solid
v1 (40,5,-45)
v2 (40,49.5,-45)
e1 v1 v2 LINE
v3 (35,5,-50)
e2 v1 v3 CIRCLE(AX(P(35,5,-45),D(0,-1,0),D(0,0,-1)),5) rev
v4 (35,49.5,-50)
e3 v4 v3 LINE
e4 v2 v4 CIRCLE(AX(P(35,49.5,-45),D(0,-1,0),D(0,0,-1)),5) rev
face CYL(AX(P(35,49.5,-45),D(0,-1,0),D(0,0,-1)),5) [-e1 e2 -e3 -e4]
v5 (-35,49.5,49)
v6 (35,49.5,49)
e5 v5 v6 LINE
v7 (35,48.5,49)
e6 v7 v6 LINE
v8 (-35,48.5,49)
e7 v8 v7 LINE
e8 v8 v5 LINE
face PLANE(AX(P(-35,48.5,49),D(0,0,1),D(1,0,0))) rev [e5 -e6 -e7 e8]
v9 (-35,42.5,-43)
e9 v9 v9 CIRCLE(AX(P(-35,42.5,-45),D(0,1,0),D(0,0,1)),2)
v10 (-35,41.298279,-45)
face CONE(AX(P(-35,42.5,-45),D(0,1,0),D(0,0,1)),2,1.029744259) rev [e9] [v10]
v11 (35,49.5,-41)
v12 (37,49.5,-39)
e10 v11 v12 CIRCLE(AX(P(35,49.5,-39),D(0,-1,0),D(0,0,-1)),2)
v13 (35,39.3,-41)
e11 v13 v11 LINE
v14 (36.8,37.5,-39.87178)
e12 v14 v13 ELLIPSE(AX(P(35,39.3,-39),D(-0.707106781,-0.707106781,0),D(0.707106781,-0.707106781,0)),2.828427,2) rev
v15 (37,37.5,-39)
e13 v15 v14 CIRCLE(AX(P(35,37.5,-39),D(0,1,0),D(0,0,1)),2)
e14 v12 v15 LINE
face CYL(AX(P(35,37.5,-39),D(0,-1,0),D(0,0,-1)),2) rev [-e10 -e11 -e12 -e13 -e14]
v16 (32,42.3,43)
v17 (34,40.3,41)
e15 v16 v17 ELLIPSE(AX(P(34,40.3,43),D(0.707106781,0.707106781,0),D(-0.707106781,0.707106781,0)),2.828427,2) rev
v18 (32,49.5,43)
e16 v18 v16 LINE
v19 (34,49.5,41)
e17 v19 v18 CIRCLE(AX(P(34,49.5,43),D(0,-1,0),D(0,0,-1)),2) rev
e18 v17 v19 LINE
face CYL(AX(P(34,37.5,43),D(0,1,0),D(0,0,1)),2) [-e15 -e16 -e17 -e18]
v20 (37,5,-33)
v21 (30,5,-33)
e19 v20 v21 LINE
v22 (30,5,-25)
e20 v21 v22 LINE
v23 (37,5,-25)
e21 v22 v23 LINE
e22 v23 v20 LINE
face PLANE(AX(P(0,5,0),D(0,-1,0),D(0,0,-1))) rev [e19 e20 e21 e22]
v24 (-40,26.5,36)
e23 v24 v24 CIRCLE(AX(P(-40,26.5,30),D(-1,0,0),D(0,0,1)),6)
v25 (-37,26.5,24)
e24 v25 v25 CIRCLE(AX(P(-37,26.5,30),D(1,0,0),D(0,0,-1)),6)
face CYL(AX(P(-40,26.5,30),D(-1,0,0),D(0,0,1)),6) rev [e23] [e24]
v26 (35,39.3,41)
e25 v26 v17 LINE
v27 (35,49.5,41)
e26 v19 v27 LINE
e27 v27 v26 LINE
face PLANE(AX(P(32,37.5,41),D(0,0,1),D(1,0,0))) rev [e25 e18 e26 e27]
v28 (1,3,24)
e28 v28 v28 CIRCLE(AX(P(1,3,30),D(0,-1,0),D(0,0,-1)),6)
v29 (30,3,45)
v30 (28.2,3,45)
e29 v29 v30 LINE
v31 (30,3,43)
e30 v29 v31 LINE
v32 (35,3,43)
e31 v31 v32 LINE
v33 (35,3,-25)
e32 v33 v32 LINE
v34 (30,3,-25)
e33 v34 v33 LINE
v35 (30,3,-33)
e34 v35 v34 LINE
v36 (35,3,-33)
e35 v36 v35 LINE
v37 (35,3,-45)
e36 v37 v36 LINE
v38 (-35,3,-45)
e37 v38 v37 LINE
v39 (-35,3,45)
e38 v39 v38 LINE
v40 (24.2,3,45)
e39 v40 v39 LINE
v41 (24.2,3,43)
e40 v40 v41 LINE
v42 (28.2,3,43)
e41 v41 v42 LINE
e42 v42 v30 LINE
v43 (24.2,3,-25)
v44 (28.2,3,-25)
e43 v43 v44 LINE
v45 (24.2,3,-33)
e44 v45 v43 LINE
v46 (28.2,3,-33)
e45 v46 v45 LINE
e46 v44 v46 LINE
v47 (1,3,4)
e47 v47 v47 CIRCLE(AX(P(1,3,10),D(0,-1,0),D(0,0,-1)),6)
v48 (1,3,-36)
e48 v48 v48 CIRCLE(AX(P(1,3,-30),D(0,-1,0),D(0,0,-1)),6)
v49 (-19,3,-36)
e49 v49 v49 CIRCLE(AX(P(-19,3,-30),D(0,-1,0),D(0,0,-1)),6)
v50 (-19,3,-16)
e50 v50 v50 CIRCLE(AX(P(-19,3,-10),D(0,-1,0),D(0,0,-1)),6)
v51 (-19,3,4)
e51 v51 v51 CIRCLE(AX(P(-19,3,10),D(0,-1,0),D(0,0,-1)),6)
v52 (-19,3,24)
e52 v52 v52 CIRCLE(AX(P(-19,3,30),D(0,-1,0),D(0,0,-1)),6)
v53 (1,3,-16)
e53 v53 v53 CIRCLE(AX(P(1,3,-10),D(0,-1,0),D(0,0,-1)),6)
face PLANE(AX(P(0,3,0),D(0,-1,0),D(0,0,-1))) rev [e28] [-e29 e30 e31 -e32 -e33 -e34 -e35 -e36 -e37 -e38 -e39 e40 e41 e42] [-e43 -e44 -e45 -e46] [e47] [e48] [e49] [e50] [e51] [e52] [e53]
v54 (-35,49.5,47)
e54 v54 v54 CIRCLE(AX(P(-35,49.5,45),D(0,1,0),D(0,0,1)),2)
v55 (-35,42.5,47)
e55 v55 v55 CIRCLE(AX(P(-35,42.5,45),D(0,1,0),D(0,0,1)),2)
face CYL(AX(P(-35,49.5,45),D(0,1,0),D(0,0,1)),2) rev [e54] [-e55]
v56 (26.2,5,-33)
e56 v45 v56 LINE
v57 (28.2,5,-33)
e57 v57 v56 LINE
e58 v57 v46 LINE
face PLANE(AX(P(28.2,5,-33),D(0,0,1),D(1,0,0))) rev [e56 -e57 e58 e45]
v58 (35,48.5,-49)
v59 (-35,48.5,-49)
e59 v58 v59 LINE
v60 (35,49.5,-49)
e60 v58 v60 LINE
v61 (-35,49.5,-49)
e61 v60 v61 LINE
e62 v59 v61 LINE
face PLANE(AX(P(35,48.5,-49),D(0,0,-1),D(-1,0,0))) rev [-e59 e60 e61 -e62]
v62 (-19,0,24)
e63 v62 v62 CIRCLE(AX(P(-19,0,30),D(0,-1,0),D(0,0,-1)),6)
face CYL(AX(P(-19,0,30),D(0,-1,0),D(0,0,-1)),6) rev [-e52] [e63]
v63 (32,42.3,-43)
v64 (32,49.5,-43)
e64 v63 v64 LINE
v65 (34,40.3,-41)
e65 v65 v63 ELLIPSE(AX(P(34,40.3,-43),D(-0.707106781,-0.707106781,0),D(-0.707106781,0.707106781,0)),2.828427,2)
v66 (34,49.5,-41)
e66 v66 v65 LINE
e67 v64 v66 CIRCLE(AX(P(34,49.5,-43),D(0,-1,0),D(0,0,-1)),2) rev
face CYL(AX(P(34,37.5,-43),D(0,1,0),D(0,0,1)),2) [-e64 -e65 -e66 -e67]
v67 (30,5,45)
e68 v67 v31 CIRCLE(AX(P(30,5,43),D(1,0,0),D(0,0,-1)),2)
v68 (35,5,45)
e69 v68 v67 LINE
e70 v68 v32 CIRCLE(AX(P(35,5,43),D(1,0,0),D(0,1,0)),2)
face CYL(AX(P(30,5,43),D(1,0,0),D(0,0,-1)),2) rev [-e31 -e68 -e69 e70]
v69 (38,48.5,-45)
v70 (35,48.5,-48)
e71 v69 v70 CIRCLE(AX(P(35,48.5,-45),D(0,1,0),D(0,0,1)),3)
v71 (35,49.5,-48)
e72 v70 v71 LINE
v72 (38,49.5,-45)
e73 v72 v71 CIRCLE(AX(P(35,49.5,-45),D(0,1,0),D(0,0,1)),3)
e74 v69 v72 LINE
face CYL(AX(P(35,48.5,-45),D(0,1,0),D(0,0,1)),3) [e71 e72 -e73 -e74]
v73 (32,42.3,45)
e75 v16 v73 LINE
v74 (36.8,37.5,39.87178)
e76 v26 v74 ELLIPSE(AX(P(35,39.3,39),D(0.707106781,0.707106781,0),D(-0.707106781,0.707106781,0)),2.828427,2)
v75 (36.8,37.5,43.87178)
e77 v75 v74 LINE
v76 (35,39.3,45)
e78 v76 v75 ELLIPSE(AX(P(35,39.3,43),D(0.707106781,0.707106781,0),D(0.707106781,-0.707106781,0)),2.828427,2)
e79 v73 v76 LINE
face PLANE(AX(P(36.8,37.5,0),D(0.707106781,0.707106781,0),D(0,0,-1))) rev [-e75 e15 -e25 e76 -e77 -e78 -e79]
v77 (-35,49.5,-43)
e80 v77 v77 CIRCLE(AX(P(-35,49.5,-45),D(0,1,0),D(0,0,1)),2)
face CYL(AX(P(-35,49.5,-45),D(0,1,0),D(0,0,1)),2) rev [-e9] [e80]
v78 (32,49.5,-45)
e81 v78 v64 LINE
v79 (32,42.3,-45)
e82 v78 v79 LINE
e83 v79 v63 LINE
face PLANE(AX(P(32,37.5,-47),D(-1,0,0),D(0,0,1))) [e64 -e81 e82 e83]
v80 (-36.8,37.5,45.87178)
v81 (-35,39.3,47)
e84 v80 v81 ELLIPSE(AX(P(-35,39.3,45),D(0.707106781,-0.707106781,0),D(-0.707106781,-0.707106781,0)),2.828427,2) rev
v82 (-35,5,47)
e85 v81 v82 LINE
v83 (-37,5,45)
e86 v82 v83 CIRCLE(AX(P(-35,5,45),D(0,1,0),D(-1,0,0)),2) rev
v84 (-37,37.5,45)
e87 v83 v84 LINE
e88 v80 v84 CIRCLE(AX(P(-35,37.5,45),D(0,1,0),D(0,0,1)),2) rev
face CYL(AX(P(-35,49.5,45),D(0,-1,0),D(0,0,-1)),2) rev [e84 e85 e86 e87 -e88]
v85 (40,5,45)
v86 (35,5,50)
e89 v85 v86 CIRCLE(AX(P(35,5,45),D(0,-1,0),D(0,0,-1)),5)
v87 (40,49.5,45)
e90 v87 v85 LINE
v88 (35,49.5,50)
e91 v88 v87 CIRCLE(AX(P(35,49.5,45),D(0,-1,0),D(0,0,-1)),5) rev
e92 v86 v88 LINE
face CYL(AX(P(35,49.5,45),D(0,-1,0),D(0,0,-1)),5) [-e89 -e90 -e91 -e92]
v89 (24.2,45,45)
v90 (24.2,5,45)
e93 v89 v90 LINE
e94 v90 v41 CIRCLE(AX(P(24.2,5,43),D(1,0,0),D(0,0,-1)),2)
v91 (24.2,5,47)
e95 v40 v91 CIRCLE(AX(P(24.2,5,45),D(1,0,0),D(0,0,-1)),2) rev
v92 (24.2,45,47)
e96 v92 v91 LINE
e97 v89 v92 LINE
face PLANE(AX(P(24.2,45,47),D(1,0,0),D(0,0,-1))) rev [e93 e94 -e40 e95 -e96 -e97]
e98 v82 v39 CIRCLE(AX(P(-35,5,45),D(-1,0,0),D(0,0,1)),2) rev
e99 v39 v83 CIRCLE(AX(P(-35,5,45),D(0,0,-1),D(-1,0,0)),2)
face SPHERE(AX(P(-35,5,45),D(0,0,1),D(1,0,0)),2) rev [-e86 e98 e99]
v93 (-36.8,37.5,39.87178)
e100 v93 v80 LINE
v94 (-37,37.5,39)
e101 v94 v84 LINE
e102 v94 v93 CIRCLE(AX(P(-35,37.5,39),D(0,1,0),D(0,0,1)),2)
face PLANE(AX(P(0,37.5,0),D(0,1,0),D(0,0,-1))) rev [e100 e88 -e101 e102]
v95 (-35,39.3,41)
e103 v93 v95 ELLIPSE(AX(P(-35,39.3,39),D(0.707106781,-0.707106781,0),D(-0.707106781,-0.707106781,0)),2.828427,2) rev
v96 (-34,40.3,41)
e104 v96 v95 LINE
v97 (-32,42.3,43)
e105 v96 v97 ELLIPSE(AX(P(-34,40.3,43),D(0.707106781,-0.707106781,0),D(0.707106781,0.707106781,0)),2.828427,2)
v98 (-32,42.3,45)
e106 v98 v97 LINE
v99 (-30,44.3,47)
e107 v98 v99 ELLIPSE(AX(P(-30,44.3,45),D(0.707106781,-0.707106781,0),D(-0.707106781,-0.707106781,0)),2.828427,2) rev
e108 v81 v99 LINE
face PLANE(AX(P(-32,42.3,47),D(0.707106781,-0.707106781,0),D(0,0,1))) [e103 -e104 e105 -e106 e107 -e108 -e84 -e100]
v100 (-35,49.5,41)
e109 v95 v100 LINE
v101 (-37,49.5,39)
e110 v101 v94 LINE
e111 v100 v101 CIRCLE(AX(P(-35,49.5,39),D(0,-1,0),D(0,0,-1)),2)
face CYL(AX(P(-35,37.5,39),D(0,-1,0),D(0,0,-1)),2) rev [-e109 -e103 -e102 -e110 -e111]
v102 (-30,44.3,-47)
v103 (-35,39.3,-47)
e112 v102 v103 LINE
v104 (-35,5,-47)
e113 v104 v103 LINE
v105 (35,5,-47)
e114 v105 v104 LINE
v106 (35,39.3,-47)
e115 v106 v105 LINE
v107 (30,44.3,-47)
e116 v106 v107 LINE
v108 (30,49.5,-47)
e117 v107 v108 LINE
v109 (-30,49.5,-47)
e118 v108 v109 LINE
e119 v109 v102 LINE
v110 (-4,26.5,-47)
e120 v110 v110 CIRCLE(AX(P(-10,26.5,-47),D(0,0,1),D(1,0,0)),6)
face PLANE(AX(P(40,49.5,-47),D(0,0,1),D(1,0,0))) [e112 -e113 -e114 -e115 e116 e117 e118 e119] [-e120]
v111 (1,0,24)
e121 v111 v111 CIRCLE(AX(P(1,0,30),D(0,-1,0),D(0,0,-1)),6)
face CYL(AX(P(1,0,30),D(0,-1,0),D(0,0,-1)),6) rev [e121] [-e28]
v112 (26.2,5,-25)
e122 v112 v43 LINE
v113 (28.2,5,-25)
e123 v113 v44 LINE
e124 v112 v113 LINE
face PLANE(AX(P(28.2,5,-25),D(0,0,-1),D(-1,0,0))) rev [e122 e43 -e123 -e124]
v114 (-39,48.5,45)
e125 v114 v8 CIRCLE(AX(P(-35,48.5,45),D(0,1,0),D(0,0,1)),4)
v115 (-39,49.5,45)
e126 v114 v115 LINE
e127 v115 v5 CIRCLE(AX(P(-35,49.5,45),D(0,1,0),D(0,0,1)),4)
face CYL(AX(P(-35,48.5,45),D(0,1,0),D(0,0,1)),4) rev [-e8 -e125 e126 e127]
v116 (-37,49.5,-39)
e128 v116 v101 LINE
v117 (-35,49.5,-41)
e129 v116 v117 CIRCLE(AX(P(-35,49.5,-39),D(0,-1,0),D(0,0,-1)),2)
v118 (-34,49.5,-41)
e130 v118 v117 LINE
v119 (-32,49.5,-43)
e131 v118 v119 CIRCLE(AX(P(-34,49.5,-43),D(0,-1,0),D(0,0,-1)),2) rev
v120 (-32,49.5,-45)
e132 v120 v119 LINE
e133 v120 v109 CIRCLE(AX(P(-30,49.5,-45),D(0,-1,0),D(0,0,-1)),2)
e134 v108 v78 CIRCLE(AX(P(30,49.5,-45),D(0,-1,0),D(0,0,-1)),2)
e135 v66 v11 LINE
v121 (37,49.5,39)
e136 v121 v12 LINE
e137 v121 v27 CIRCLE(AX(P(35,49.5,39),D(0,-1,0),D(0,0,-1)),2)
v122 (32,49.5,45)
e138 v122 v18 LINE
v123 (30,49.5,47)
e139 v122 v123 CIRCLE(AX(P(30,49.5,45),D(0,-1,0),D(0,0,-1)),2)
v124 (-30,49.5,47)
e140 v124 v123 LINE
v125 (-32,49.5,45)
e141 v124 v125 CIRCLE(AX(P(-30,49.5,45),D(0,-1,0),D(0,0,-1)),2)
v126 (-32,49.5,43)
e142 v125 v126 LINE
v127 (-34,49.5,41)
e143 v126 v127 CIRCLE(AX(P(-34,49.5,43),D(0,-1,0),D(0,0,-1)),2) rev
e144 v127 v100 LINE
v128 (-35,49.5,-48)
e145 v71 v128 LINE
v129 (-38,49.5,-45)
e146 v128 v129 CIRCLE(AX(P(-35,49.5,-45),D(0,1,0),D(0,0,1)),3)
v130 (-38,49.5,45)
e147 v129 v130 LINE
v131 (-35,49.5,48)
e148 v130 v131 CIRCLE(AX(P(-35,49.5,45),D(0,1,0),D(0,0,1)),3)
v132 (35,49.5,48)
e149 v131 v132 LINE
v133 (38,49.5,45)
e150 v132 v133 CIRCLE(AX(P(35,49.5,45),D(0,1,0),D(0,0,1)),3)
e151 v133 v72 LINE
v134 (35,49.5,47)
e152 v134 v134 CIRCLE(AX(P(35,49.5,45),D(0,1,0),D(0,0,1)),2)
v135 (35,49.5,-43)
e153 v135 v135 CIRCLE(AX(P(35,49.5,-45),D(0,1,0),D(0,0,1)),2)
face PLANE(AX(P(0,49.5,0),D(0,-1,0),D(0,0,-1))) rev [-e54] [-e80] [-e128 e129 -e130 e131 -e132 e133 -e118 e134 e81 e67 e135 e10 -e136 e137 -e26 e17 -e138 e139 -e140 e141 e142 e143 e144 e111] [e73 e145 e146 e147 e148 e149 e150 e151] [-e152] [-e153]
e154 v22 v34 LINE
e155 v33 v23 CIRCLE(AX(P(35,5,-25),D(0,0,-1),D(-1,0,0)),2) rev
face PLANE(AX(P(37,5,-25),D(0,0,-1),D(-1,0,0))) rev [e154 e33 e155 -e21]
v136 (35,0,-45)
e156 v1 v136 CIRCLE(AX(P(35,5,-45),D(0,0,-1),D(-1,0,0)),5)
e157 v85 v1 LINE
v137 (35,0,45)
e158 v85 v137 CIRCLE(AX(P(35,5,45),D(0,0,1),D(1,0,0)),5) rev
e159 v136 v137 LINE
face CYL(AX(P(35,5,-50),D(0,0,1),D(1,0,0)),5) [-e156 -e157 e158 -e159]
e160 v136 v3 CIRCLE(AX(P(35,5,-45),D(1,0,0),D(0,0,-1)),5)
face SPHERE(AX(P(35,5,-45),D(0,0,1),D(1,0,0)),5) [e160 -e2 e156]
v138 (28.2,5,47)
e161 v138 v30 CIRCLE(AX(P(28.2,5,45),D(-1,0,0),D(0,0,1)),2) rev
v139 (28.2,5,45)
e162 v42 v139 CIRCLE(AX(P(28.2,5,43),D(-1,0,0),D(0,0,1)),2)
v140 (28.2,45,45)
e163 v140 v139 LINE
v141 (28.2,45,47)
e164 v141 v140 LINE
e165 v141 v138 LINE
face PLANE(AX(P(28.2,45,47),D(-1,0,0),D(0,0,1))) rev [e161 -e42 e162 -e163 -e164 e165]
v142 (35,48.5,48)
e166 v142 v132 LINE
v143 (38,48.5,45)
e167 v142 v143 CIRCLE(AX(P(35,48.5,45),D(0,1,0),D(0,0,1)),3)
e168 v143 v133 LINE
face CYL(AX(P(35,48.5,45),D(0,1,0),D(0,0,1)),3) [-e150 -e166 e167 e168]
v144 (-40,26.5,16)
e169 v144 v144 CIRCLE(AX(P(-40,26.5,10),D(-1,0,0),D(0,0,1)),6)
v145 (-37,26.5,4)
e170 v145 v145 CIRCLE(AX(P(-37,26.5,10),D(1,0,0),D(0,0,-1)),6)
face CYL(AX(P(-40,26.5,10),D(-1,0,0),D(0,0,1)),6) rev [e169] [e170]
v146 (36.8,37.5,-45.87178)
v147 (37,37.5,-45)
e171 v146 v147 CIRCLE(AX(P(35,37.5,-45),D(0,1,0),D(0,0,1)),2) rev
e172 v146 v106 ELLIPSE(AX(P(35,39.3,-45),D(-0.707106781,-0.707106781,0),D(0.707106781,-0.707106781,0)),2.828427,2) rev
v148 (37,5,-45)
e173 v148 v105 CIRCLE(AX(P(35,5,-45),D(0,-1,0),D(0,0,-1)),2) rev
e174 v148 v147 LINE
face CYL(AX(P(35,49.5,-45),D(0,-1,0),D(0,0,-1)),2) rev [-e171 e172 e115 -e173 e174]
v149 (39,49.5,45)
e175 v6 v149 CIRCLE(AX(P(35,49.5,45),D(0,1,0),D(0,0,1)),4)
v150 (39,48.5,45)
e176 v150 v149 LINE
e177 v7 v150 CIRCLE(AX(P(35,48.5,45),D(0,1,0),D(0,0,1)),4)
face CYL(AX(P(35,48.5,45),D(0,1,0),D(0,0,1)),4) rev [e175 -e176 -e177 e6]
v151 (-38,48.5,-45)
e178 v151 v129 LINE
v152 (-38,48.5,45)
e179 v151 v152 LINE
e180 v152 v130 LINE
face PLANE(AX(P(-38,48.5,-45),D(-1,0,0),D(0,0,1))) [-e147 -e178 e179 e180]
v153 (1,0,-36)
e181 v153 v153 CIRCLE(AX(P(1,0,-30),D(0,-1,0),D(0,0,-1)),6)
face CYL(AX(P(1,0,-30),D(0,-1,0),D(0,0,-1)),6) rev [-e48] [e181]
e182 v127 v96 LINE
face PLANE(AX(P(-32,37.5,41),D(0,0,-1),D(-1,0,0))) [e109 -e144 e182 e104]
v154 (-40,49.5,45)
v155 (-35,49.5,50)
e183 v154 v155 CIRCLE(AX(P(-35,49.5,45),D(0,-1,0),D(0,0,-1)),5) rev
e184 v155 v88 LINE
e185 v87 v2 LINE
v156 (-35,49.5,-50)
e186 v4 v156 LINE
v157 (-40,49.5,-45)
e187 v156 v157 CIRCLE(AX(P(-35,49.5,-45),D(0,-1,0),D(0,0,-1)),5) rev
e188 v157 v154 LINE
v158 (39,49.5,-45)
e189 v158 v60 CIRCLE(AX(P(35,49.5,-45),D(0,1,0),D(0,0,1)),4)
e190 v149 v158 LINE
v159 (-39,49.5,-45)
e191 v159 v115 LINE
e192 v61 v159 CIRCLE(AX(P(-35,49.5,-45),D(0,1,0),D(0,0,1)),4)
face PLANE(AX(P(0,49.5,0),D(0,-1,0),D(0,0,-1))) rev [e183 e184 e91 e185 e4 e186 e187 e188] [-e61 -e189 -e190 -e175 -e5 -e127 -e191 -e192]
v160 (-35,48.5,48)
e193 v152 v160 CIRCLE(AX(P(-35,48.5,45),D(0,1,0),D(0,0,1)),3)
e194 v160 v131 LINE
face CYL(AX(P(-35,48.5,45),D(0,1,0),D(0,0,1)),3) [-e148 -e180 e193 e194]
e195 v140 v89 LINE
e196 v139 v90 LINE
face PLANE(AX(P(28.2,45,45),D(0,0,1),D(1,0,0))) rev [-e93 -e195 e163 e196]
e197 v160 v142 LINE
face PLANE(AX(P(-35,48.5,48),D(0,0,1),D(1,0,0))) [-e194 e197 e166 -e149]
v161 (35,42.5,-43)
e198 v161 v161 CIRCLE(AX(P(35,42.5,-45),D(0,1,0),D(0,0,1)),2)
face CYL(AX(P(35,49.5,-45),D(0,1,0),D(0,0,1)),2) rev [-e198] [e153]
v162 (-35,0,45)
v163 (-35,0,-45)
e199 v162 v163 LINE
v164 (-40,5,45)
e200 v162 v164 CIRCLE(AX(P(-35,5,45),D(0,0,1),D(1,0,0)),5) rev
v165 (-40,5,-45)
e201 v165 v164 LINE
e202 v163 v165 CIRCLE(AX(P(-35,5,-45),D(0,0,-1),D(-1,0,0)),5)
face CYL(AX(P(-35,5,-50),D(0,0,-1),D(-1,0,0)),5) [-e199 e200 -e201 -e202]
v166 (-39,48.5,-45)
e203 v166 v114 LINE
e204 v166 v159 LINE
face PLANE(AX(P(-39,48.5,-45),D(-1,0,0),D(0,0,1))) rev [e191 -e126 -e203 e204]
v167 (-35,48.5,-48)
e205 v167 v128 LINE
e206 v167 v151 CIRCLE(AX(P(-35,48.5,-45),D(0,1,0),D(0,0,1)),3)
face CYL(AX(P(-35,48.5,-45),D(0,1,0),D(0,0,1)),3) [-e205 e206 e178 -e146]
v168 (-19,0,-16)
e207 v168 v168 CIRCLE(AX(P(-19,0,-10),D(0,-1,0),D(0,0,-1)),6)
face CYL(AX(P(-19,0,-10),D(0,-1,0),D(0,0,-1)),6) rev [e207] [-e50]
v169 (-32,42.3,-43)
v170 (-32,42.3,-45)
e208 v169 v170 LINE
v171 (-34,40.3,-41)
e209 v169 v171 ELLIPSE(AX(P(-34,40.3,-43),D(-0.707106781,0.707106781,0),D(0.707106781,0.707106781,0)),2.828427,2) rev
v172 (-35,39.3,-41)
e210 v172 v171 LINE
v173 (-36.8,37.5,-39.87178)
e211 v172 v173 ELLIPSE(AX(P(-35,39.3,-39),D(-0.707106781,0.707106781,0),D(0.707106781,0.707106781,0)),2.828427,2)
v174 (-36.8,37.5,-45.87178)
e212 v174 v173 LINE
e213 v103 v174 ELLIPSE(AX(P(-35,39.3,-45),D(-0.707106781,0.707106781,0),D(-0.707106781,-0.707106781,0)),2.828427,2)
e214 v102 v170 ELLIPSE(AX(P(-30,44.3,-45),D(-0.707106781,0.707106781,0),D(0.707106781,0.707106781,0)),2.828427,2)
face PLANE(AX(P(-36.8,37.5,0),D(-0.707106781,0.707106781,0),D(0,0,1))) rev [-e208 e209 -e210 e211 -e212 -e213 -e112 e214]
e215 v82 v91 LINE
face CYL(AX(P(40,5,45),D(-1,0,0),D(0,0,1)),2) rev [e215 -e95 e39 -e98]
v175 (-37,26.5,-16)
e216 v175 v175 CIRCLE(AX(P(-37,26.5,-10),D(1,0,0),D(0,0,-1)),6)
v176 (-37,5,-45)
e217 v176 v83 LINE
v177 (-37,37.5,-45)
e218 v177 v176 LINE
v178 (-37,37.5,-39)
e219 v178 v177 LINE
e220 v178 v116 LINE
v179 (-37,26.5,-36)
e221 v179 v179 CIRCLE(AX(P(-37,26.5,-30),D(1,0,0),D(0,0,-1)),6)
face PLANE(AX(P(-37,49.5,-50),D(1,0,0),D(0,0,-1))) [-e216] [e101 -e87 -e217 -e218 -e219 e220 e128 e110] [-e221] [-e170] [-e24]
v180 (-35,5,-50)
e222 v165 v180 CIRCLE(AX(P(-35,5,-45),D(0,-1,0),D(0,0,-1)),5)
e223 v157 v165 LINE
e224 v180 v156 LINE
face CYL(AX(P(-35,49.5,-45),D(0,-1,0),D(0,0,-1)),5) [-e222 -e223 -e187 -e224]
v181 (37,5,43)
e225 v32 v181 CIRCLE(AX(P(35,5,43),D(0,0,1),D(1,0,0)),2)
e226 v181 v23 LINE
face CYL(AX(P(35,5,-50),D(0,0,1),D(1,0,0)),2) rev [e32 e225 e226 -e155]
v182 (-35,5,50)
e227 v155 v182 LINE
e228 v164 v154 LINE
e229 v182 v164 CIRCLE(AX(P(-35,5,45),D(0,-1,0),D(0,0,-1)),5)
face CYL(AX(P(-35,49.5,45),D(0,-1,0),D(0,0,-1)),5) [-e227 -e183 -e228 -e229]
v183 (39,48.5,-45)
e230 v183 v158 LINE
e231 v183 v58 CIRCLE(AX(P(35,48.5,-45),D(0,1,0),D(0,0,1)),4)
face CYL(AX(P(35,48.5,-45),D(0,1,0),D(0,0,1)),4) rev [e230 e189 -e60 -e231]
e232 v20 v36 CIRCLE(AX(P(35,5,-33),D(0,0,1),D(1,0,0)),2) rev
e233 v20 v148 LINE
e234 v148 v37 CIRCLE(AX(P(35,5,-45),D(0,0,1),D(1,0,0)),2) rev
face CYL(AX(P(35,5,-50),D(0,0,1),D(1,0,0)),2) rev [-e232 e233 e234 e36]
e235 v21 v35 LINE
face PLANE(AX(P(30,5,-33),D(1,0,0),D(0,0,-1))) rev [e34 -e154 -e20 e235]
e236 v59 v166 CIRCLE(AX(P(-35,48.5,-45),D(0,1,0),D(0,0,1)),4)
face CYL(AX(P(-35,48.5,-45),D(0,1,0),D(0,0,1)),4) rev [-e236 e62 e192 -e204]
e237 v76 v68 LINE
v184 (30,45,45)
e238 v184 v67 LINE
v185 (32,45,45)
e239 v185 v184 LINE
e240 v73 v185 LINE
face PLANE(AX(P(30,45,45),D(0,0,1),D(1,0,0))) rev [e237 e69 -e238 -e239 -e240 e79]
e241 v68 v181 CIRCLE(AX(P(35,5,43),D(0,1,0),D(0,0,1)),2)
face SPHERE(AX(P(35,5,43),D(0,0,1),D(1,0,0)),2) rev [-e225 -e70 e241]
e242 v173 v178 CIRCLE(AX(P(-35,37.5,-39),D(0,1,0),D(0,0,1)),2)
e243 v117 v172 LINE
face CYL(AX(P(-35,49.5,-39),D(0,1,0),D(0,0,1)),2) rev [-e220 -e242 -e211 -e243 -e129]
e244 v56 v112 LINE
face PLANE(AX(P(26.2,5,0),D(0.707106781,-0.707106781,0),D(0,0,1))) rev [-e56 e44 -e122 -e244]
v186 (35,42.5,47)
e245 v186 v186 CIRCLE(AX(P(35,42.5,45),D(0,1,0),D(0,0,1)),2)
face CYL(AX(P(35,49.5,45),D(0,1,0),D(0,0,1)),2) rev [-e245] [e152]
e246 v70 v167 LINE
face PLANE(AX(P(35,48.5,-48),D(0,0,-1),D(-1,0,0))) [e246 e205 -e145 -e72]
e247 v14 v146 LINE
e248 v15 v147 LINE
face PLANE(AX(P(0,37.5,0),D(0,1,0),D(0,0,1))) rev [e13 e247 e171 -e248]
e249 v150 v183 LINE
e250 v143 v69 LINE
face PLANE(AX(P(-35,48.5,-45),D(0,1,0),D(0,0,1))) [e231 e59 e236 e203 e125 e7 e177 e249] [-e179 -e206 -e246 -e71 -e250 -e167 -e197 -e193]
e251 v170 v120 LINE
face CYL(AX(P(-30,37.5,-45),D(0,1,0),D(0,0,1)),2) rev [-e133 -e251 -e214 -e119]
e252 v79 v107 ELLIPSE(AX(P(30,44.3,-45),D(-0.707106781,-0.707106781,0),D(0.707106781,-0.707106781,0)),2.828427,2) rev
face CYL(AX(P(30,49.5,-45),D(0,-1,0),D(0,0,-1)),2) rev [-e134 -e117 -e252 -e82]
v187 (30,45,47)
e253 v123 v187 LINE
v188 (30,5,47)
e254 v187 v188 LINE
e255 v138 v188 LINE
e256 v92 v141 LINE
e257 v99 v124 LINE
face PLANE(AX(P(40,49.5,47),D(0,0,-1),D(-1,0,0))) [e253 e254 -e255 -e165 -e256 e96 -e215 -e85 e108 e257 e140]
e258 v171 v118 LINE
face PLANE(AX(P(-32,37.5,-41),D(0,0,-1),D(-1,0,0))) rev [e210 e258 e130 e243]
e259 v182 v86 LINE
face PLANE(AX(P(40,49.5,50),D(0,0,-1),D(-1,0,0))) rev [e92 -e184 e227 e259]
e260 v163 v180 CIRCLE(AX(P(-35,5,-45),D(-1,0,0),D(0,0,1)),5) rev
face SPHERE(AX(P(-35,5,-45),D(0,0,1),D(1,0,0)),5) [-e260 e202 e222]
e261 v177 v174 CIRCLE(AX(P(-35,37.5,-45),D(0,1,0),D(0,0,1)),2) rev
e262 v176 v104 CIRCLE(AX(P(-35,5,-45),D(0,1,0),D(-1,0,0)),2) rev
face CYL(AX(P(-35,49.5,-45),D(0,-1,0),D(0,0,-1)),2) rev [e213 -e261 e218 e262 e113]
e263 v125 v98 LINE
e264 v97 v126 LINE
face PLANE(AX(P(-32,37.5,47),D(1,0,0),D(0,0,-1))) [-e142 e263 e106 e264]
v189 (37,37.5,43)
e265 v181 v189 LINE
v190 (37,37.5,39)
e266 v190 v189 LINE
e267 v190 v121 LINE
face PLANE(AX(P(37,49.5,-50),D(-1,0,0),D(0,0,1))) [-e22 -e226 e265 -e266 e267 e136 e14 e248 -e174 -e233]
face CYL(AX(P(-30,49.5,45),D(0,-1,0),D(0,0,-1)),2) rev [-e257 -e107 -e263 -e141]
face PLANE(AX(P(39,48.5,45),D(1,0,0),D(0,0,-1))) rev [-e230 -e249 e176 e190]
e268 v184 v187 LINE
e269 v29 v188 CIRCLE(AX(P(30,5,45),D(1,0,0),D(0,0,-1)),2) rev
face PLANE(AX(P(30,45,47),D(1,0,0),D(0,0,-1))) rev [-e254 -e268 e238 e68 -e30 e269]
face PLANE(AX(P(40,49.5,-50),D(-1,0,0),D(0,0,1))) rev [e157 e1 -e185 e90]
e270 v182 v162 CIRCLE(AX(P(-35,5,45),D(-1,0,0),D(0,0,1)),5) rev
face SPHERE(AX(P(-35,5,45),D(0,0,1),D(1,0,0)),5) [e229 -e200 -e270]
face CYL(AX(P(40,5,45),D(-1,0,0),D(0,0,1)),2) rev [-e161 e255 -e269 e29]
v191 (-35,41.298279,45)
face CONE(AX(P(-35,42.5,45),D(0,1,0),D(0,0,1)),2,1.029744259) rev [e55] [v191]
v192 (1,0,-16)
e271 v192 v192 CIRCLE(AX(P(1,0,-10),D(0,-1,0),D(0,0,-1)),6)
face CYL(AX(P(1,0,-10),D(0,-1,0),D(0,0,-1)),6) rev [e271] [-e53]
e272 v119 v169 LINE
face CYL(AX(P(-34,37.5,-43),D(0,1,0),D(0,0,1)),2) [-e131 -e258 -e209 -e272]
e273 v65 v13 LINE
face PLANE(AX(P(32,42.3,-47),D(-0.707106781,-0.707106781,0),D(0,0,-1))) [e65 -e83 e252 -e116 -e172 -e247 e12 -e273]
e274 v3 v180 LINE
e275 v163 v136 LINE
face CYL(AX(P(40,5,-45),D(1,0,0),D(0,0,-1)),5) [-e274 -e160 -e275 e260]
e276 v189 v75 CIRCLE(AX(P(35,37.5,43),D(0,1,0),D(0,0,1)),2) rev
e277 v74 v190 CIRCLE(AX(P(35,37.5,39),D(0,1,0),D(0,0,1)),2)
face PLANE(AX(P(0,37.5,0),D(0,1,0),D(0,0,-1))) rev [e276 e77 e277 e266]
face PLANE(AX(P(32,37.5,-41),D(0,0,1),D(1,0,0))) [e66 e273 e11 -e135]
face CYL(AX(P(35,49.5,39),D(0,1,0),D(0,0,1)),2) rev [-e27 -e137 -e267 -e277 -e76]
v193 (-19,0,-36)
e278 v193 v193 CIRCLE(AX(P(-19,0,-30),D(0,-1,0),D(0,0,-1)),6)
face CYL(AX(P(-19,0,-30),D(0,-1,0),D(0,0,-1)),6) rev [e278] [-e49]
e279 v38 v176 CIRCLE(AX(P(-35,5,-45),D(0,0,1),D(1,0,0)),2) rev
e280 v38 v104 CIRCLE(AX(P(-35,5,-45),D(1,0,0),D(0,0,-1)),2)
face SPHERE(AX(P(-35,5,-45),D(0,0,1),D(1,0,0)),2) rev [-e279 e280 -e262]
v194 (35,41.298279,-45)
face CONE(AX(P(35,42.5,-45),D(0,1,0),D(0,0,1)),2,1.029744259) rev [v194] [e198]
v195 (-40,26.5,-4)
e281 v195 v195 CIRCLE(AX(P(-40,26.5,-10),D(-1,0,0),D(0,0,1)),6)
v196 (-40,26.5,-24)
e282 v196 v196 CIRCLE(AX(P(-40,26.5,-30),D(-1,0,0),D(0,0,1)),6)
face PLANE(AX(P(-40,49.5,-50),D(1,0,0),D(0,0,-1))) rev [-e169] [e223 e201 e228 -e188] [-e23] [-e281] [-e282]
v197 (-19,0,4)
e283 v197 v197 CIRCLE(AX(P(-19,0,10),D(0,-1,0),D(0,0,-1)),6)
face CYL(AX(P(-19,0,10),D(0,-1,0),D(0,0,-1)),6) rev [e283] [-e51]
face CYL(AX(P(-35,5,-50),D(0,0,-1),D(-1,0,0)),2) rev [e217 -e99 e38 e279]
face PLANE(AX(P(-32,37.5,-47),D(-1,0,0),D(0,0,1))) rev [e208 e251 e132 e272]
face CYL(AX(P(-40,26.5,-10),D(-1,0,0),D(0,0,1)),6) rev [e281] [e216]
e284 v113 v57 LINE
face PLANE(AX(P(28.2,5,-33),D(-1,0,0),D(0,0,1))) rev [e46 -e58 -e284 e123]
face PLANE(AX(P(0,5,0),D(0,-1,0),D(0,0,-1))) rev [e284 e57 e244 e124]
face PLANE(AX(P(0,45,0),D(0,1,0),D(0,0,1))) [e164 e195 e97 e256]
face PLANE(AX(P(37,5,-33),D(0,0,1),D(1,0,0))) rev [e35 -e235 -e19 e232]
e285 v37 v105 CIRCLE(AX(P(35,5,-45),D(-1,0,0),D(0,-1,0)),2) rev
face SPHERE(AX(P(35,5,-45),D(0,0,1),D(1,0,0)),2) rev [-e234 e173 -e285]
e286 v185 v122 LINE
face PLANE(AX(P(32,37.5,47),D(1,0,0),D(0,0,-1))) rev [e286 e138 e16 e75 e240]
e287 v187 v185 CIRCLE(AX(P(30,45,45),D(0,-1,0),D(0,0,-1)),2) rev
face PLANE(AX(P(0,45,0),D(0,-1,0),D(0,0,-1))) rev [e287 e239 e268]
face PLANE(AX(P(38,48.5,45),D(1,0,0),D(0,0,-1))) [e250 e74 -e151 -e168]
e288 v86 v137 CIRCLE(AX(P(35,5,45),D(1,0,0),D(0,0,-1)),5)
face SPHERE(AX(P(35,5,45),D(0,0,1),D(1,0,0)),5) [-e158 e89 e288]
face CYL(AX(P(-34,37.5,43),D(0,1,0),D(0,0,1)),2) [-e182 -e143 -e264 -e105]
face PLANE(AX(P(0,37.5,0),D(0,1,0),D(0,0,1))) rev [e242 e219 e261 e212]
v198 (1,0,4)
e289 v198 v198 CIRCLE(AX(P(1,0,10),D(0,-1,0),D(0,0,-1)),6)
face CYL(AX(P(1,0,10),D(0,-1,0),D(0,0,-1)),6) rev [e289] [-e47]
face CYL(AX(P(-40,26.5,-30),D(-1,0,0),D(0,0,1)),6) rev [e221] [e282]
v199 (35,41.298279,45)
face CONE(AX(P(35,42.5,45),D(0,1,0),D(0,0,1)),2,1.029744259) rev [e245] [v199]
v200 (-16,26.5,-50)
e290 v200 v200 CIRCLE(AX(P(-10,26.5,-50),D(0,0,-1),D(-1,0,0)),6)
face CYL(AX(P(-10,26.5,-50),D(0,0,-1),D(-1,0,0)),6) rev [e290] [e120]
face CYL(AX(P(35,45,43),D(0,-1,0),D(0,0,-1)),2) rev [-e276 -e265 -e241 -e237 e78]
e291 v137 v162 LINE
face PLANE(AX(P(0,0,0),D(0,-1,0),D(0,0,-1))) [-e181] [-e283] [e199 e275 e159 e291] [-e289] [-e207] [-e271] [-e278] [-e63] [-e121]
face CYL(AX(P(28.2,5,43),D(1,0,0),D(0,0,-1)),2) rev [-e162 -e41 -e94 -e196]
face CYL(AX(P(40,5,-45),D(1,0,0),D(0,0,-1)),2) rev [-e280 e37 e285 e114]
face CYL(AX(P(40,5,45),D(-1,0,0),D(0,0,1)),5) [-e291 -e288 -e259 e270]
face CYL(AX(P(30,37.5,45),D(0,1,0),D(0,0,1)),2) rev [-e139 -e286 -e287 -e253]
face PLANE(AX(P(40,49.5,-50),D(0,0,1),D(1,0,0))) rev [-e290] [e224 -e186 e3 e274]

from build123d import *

# Parameters (mm, degrees)
SKICA1_W                     = 80
SKICA1_H                     = 100
P_IDAT_VYSUNUT_M1_DEPTH      = 49.5
ZAOBLIT1_R                   = 5
SKO_EPINA1_T                 = -3
F_12_0_12_PR_M_R_D_RY1_D     = 12
ODEBRAT_VYSUNUT_M1_DEPTH     = 1
SKICA6_W                     = 7
SKICA6_H                     = 8
SKICA6_W_2                   = 4
P_IDAT_VYSUNUT_M2_DEPTH      = 2
SKICA7_W                     = 4
SKICA7_H                     = 2
SKICA7_W_2                   = 7
P_IDAT_VYSUNUT_M3_DEPTH      = 42
ZAOBLIT2_R                   = 2
ZKOSEN_1_SIZE                = 2
F_12_0_12_PR_M_R_D_RY2_D     = 12
F_12_0_12_PR_M_R_D_RY2_DEPTH = 5
F_12_0_12_PR_M_R_D_RY2_TIP   = 3.605163714
F_12_0_12_PR_M_R_D_RY3_D     = 12
F_12_0_12_PR_M_R_D_RY3_DEPTH = 5
F_12_0_12_PR_M_R_D_RY3_TIP   = 3.605163714
SKICA12_W                    = 5
SKICA12_H                    = 6
P_IDAT_VYSUNUT_M9_DEPTH      = 12
ZRCADLIT2_COPY_1_SKETCH_W    = 5
ZRCADLIT2_COPY_1_SKETCH_H    = 6
ZRCADLIT2_COPY_1_DEPTH       = 12
ZKOSEN_2_SIZE                = 4.8
ZAOBLIT3_R                   = 2


# Some blends are built 0.0001 mm under size
with BuildPart() as part:
    # Skica1 → Přidat vysunutím1 (new body)
    with BuildSketch(Plane(origin=(0, 0, 0), x_dir=(1, 0, 0), z_dir=(0, 1, 0))):
        Rectangle(SKICA1_W, SKICA1_H)
    extrude(amount=P_IDAT_VYSUNUT_M1_DEPTH)

    # Zaoblit1
    zaoblit1_edges = [part.edges().sort_by_distance(p)[0] for p in [
        (0, 0, -50),
        (40, 0, 0),
        (0, 0, 50),
        (-40, 0, 0),
        (-40, 24.75, -50),
        (40, 24.75, -50),
        (40, 24.75, 50),
        (-40, 24.75, 50),
    ]]
    fillet(zaoblit1_edges, radius=ZAOBLIT1_R)

    # Skořepina1
    sko_epina1_openings = [part.faces().sort_by_distance(p)[0] for p in [
        (0, 49.5, 0),
    ]]
    offset(amount=SKO_EPINA1_T, openings=sko_epina1_openings, kind=Kind.INTERSECTION)

    # Ø12.0 (12) průměr díry1 (through all)
    with Locations(Plane(origin=(0, 0, 0), x_dir=(-1, 0, 0), z_dir=(0, -1, 0))):
        with Locations((-1, 30), (-1, 10), (-1, -10), (-1, -30), (19, -30), (19, -10), (19, 10), (19, 30)):
            Hole(F_12_0_12_PR_M_R_D_RY1_D / 2)

    # Skica4 → Odebrat vysunutím1 (cut)
    with BuildSketch(Plane(origin=(0, 49.5, 0), x_dir=(1, 0, 0), z_dir=(0, 1, 0))):
        with BuildLine():
            Line((35, 49), (-35, 49))
            ThreePointArc((-35, 49), (-37.828427125, 47.828427125), (-39, 45))
            Line((-39, 45), (-39, -45))
            ThreePointArc((-39, -45), (-37.828427125, -47.828427125), (-35, -49))
            Line((-35, -49), (35, -49))
            ThreePointArc((35, -49), (37.828427125, -47.828427125), (39, -45))
            Line((39, -45), (39, 45))
            ThreePointArc((39, 45), (37.828427125, 47.828427125), (35, 49))
        make_face()
        with BuildLine():
            Line((-35, -48), (35, -48))
            ThreePointArc((35, -48), (37.121320344, -47.121320344), (38, -45))
            Line((38, -45), (38, 45))
            ThreePointArc((38, 45), (37.121320344, 47.121320344), (35, 48))
            Line((35, 48), (-35, 48))
            ThreePointArc((-35, 48), (-37.121320344, 47.121320344), (-38, 45))
            Line((-38, 45), (-38, -45))
            ThreePointArc((-38, -45), (-37.121320344, -47.121320344), (-35, -48))
        make_face(mode=Mode.SUBTRACT)
    extrude(amount=-ODEBRAT_VYSUNUT_M1_DEPTH, mode=Mode.SUBTRACT)

    # Skica6 → Přidat vysunutím2 (add)
    with BuildSketch(Plane(origin=(0, 3, 0), x_dir=(1, 0, 0), z_dir=(0, 1, 0))):
        with Locations((33.5, 29)):
            Rectangle(SKICA6_W, SKICA6_H)
        with Locations((26.2, 29)):
            Rectangle(SKICA6_W_2, SKICA6_H)
    extrude(amount=P_IDAT_VYSUNUT_M2_DEPTH)

    # Skica7 → Přidat vysunutím3 (add)
    with BuildSketch(Plane(origin=(0, 3, 0), x_dir=(1, 0, 0), z_dir=(0, 1, 0))):
        with Locations((26.2, -46)):
            Rectangle(SKICA7_W, SKICA7_H)
        with Locations((33.5, -46)):
            Rectangle(SKICA7_W_2, SKICA7_H)
    extrude(amount=P_IDAT_VYSUNUT_M3_DEPTH)

    # Zaoblit2
    # the kernel refuses this fillet: 2 mm, written as the material it adds along each edge
    with BuildSketch(Plane(origin=(24.2, 3, 45), x_dir=(0, 0, -1), z_dir=(1, 0, 0))) as zaoblit2_piece_1:
        with BuildLine():
            CenterArc((ZAOBLIT2_R, ZAOBLIT2_R), ZAOBLIT2_R, 180, 90)
            Line((0, ZAOBLIT2_R), (0, 0))
            Line((0, 0), (ZAOBLIT2_R, 0))
        make_face()
    extrude(amount=4)
    with BuildSketch(Plane(origin=(24.2, 3, 45), x_dir=(0, 0, -1), z_dir=(1, 0, 0))) as zaoblit2_piece_2_section:
        with BuildLine():
            CenterArc((ZAOBLIT2_R, ZAOBLIT2_R), ZAOBLIT2_R, 180, 90)
            Line((0, ZAOBLIT2_R), (0, 0))
            Line((0, 0), (ZAOBLIT2_R, 0))
        make_face()
    zaoblit2_piece_2 = extrude(amount=9, mode=Mode.PRIVATE)
    zaoblit2_piece_2 = split(zaoblit2_piece_2, bisect_by=Plane(origin=(30, 3.452790229, 44.547209771), z_dir=(1, 0, 0)), keep=Keep.TOP, mode=Mode.PRIVATE)
    add(zaoblit2_piece_2)
    with BuildSketch(Plane(origin=(37, 5, 45), x_dir=(-1, 0, 0), z_dir=(0, 1, 0))) as zaoblit2_piece_3:
        with BuildLine():
            CenterArc((ZAOBLIT2_R, -ZAOBLIT2_R), ZAOBLIT2_R, 90, 90)
            Line((0, -ZAOBLIT2_R), (0, 0))
            Line((0, 0), (ZAOBLIT2_R, 0))
        make_face()
    extrude(amount=40)
    with BuildSketch(Plane(origin=(25, 3, 45), x_dir=(0, 0, -1), z_dir=(1, 0, 0))) as zaoblit2_piece_4_section:
        with BuildLine():
            CenterArc((ZAOBLIT2_R, ZAOBLIT2_R), ZAOBLIT2_R, 180, 90)
            Line((0, ZAOBLIT2_R), (0, 0))
            Line((0, 0), (ZAOBLIT2_R, 0))
        make_face()
    zaoblit2_piece_4 = extrude(amount=10, mode=Mode.PRIVATE)
    zaoblit2_piece_4 = split(zaoblit2_piece_4, bisect_by=Plane(origin=(28.2, 3.452790229, 44.547209771), z_dir=(-1, 0, 0)), keep=Keep.TOP, mode=Mode.PRIVATE)
    add(zaoblit2_piece_4)
    with BuildSketch(Plane(origin=(30, 3, 45), x_dir=(0, 0, -1), z_dir=(1, 0, 0))) as zaoblit2_piece_5:
        with BuildLine():
            CenterArc((ZAOBLIT2_R, ZAOBLIT2_R), ZAOBLIT2_R, 180, 90)
            Line((0, ZAOBLIT2_R), (0, 0))
            Line((0, 0), (ZAOBLIT2_R, 0))
        make_face()
    extrude(amount=5)
    with BuildSketch(Plane(origin=(35, 5, 45), x_dir=(0, -1, 0), z_dir=(-1, 0, 0))) as zaoblit2_piece_6:
        with BuildLine():
            CenterArc((2 - ZAOBLIT2_R, -ZAOBLIT2_R), ZAOBLIT2_R, 0, 90)
            Line((2 - ZAOBLIT2_R, 0), (2, 0))
            Line((2, 0), (2, -ZAOBLIT2_R))
        make_face()
    revolve(axis=Axis((35, 5, 45), (0, 0, 1)), revolution_arc=90)

    # Zkosení1
    zkosen_1_edges = [part.edges().sort_by_distance(p)[0] for p in [
        (24.2, 5, -29),
    ]]
    chamfer(zkosen_1_edges, length=ZKOSEN_1_SIZE - 0.0001)  # a hair under: the kernel refuses the full size

    # Ø12.0 (12) průměr díry2
    with Locations(Plane.ZY.offset(40)):
        with Locations((-30, 26.5), (-10, 26.5), (10, 26.5), (30, 26.5)):
            Hole(F_12_0_12_PR_M_R_D_RY2_D / 2, depth=F_12_0_12_PR_M_R_D_RY2_DEPTH)
            with Locations((0, 0, -(F_12_0_12_PR_M_R_D_RY2_DEPTH + F_12_0_12_PR_M_R_D_RY2_TIP / 2))):  # 118° drill point
                Cone(0, F_12_0_12_PR_M_R_D_RY2_D / 2, F_12_0_12_PR_M_R_D_RY2_TIP, mode=Mode.SUBTRACT)

    # Ø12.0 (12) průměr díry3
    with Locations(Plane(origin=(0, 0, -50), x_dir=(-1, 0, 0), z_dir=(0, 0, -1))):
        with Locations((10, 26.5)):
            Hole(F_12_0_12_PR_M_R_D_RY3_D / 2, depth=F_12_0_12_PR_M_R_D_RY3_DEPTH)
            with Locations((0, 0, -(F_12_0_12_PR_M_R_D_RY3_DEPTH + F_12_0_12_PR_M_R_D_RY3_TIP / 2))):  # 118° drill point
                Cone(0, F_12_0_12_PR_M_R_D_RY3_D / 2, F_12_0_12_PR_M_R_D_RY3_TIP, mode=Mode.SUBTRACT)

    # Skica12 → Přidat vysunutím9 (add)
    with BuildSketch(Plane(origin=(0, 49.5, 0), x_dir=(1, 0, 0), z_dir=(0, 1, 0))):
        with Locations((34.5, 44)):
            Rectangle(SKICA12_W, SKICA12_H)
    p_idat_vysunut_m9 = extrude(amount=-P_IDAT_VYSUNUT_M9_DEPTH)

    # Skica15 → Ø4.0 (4) průměr díry2 (revolve, cut)
    with BuildSketch(Plane(origin=(35, 49.5, -45), x_dir=(0, 0, 1), z_dir=(1, 0, 0))):
        Polygon((0, 0), (0, 8.201721238), (2, 7), (2, 0), align=None)
    f_4_0_4_pr_m_r_d_ry2 = revolve(axis=Axis((35, 55.85, -45), (0, -1, 0)), mode=Mode.SUBTRACT)

    # Zrcadlit1: Přidat vysunutím9, Ø4.0 (4) průměr díry2 across plane
    add(p_idat_vysunut_m9.mirror(Plane.XY))
    add(f_4_0_4_pr_m_r_d_ry2.mirror(Plane.XY), mode=Mode.SUBTRACT)

    # Zrcadlit2: Přidat vysunutím9, Ø4.0 (4) průměr díry2 across plane
    add(p_idat_vysunut_m9.mirror(Plane(origin=(0, 0, 0), x_dir=(0, 0, 1), z_dir=(1, 0, 0))))
    add(f_4_0_4_pr_m_r_d_ry2.mirror(Plane(origin=(0, 0, 0), x_dir=(0, 0, 1), z_dir=(1, 0, 0))), mode=Mode.SUBTRACT)

    # Zrcadlit2 copy 1 sketch → Zrcadlit2 copy 1 (add)
    with BuildSketch(Plane(origin=(0, 49.5, 0), x_dir=(-1, 0, 0), z_dir=(0, 1, 0))):
        with Locations((34.5, 44)):
            Rectangle(ZRCADLIT2_COPY_1_SKETCH_W, ZRCADLIT2_COPY_1_SKETCH_H)
    extrude(amount=-ZRCADLIT2_COPY_1_DEPTH)

    # Zrcadlit2 copy 2 sketch → Zrcadlit2 copy 2 (revolve, cut)
    with BuildSketch(Plane(origin=(-35, 49.5, 45), x_dir=(0, 0, -1), z_dir=(-1, 0, 0))):
        Polygon((0, 0), (0, 8.201721238), (2, 7), (2, 0), align=None)
    revolve(axis=Axis((-35, 55.85, 45), (0, -1, 0)), mode=Mode.SUBTRACT)

    # Zkosení2
    zkosen_2_edges = [part.edges().sort_by_distance(p)[0] for p in [
        (32, 37.5, -44),
        (32, 37.5, 43),
        (-32, 37.5, -44),
        (-32, 37.5, 44),
    ]]
    chamfer(zkosen_2_edges, length=ZKOSEN_2_SIZE)

    # Zaoblit3
    # the kernel refuses this fillet: 2 mm, written as the material it adds along each edge
    with BuildSketch(Plane(origin=(32, 49.5, -47), x_dir=(-1, 0, 0), z_dir=(0, -1, 0))) as zaoblit3_piece_1_section:
        with BuildLine():
            CenterArc((ZAOBLIT3_R, -ZAOBLIT3_R), ZAOBLIT3_R, 90, 90)
            Line((0, -ZAOBLIT3_R), (0, 0))
            Line((0, 0), (ZAOBLIT3_R, 0))
        make_face()
    zaoblit3_piece_1 = extrude(amount=12.2, mode=Mode.PRIVATE)
    zaoblit3_piece_1 = split(zaoblit3_piece_1, bisect_by=Plane(origin=(29.880566615, 44.419433385, -46.541013269), z_dir=(0.7071067811865476, 0.7071067811865476, 0)), keep=Keep.TOP, mode=Mode.PRIVATE)
    add(zaoblit3_piece_1)
    with BuildSketch(Plane(origin=(37, 49.5, -41), x_dir=(-1, 0, 0), z_dir=(0, -1, 0))) as zaoblit3_piece_2_section:
        with BuildLine():
            CenterArc((ZAOBLIT3_R, -ZAOBLIT3_R), ZAOBLIT3_R, 90, 90)
            Line((0, -ZAOBLIT3_R), (0, 0))
            Line((0, 0), (ZAOBLIT3_R, 0))
        make_face()
    zaoblit3_piece_2 = extrude(amount=12, mode=Mode.PRIVATE)
    zaoblit3_piece_2 = split(zaoblit3_piece_2, bisect_by=Plane(origin=(33.613954856, 40.686045144, -40.547204847), z_dir=(0.7071067811865476, 0.7071067811865476, 0)), keep=Keep.TOP, mode=Mode.PRIVATE)
    add(zaoblit3_piece_2)
    with BuildSketch(Plane(origin=(-32, 49.5, -47), x_dir=(1, 0, 0), z_dir=(0, -1, 0))) as zaoblit3_piece_3_section:
        with BuildLine():
            CenterArc((ZAOBLIT3_R, ZAOBLIT3_R), ZAOBLIT3_R, 180, 90)
            Line((0, ZAOBLIT3_R), (0, 0))
            Line((0, 0), (ZAOBLIT3_R, 0))
        make_face()
    zaoblit3_piece_3 = extrude(amount=12.2, mode=Mode.PRIVATE)
    zaoblit3_piece_3 = split(zaoblit3_piece_3, bisect_by=Plane(origin=(-29.880566615, 44.419433385, -46.541013269), z_dir=(-0.7071067811865476, 0.7071067811865476, 0)), keep=Keep.TOP, mode=Mode.PRIVATE)
    add(zaoblit3_piece_3)
    with BuildSketch(Plane(origin=(-37, 49.5, -41), x_dir=(0, 0, 1), z_dir=(0, -1, 0))) as zaoblit3_piece_4_section:
        with BuildLine():
            CenterArc((ZAOBLIT3_R, -ZAOBLIT3_R), ZAOBLIT3_R, 90, 90)
            Line((0, -ZAOBLIT3_R), (0, 0))
            Line((0, 0), (ZAOBLIT3_R, 0))
        make_face()
    zaoblit3_piece_4 = extrude(amount=12, mode=Mode.PRIVATE)
    zaoblit3_piece_4 = split(zaoblit3_piece_4, bisect_by=Plane(origin=(-33.613954856, 40.686045144, -40.547204847), z_dir=(-0.7071067811865476, 0.7071067811865476, 0)), keep=Keep.TOP, mode=Mode.PRIVATE)
    add(zaoblit3_piece_4)
    with BuildSketch(Plane(origin=(-32, 49.5, 47), x_dir=(1, 0, 0), z_dir=(0, -1, 0))) as zaoblit3_piece_5_section:
        with BuildLine():
            CenterArc((ZAOBLIT3_R, -ZAOBLIT3_R), ZAOBLIT3_R, 90, 90)
            Line((0, -ZAOBLIT3_R), (0, 0))
            Line((0, 0), (ZAOBLIT3_R, 0))
        make_face()
    zaoblit3_piece_5 = extrude(amount=12.2, mode=Mode.PRIVATE)
    zaoblit3_piece_5 = split(zaoblit3_piece_5, bisect_by=Plane(origin=(-29.880566615, 44.419433385, 46.541013269), z_dir=(-0.7071067811865476, 0.7071067811865476, 0)), keep=Keep.TOP, mode=Mode.PRIVATE)
    add(zaoblit3_piece_5)
    with BuildSketch(Plane(origin=(-37, 49.5, 41), x_dir=(1, 0, 0), z_dir=(0, -1, 0))) as zaoblit3_piece_6_section:
        with BuildLine():
            CenterArc((ZAOBLIT3_R, -ZAOBLIT3_R), ZAOBLIT3_R, 90, 90)
            Line((0, -ZAOBLIT3_R), (0, 0))
            Line((0, 0), (ZAOBLIT3_R, 0))
        make_face()
    zaoblit3_piece_6 = extrude(amount=12, mode=Mode.PRIVATE)
    zaoblit3_piece_6 = split(zaoblit3_piece_6, bisect_by=Plane(origin=(-33.613954856, 40.686045144, 40.547204847), z_dir=(-0.7071067811865476, 0.7071067811865476, 0)), keep=Keep.TOP, mode=Mode.PRIVATE)
    add(zaoblit3_piece_6)
    with BuildSketch(Plane(origin=(37, 49.5, 41), x_dir=(-1, 0, 0), z_dir=(0, -1, 0))) as zaoblit3_piece_7_section:
        with BuildLine():
            CenterArc((ZAOBLIT3_R, ZAOBLIT3_R), ZAOBLIT3_R, 180, 90)
            Line((0, ZAOBLIT3_R), (0, 0))
            Line((0, 0), (ZAOBLIT3_R, 0))
        make_face()
    zaoblit3_piece_7 = extrude(amount=12, mode=Mode.PRIVATE)
    zaoblit3_piece_7 = split(zaoblit3_piece_7, bisect_by=Plane(origin=(33.613954856, 40.686045144, 40.547204847), z_dir=(0.7071067811865476, 0.7071067811865476, 0)), keep=Keep.TOP, mode=Mode.PRIVATE)
    add(zaoblit3_piece_7)
    with BuildSketch(Plane(origin=(32, 49.5, 47), x_dir=(-1, 0, 0), z_dir=(0, -1, 0))) as zaoblit3_piece_8:
        with BuildLine():
            CenterArc((ZAOBLIT3_R, ZAOBLIT3_R), ZAOBLIT3_R, 180, 90)
            Line((0, ZAOBLIT3_R), (0, 0))
            Line((0, 0), (ZAOBLIT3_R, 0))
        make_face()
    extrude(amount=9.5)
    # the kernel refuses this fillet: 2 mm, written as the material it takes off along each edge
    with BuildSketch(Plane(origin=(32, 54.5, -41), x_dir=(1, 0, 0), z_dir=(0, -1, 0)), Plane(origin=(-32, 54.5, 41), x_dir=(-1, 0, 0), z_dir=(0, -1, 0))) as zaoblit3_2_piece_1:
        with BuildLine():
            CenterArc((ZAOBLIT3_R, -ZAOBLIT3_R), ZAOBLIT3_R, 90, 90)
            Line((0, -ZAOBLIT3_R), (0, 0))
            Line((0, 0), (ZAOBLIT3_R, 0))
        make_face()
    extrude(amount=17.2, mode=Mode.SUBTRACT)
    with BuildSketch(Plane(origin=(-32, 54.5, -41), x_dir=(-1, 0, 0), z_dir=(0, -1, 0)), Plane(origin=(32, 54.5, 41), x_dir=(1, 0, 0), z_dir=(0, -1, 0))) as zaoblit3_2_piece_2:
        with BuildLine():
            CenterArc((ZAOBLIT3_R, ZAOBLIT3_R), ZAOBLIT3_R, 180, 90)
            Line((0, ZAOBLIT3_R), (0, 0))
            Line((0, 0), (ZAOBLIT3_R, 0))
        make_face()
    extrude(amount=17.2, mode=Mode.SUBTRACT)


solid = part.part
